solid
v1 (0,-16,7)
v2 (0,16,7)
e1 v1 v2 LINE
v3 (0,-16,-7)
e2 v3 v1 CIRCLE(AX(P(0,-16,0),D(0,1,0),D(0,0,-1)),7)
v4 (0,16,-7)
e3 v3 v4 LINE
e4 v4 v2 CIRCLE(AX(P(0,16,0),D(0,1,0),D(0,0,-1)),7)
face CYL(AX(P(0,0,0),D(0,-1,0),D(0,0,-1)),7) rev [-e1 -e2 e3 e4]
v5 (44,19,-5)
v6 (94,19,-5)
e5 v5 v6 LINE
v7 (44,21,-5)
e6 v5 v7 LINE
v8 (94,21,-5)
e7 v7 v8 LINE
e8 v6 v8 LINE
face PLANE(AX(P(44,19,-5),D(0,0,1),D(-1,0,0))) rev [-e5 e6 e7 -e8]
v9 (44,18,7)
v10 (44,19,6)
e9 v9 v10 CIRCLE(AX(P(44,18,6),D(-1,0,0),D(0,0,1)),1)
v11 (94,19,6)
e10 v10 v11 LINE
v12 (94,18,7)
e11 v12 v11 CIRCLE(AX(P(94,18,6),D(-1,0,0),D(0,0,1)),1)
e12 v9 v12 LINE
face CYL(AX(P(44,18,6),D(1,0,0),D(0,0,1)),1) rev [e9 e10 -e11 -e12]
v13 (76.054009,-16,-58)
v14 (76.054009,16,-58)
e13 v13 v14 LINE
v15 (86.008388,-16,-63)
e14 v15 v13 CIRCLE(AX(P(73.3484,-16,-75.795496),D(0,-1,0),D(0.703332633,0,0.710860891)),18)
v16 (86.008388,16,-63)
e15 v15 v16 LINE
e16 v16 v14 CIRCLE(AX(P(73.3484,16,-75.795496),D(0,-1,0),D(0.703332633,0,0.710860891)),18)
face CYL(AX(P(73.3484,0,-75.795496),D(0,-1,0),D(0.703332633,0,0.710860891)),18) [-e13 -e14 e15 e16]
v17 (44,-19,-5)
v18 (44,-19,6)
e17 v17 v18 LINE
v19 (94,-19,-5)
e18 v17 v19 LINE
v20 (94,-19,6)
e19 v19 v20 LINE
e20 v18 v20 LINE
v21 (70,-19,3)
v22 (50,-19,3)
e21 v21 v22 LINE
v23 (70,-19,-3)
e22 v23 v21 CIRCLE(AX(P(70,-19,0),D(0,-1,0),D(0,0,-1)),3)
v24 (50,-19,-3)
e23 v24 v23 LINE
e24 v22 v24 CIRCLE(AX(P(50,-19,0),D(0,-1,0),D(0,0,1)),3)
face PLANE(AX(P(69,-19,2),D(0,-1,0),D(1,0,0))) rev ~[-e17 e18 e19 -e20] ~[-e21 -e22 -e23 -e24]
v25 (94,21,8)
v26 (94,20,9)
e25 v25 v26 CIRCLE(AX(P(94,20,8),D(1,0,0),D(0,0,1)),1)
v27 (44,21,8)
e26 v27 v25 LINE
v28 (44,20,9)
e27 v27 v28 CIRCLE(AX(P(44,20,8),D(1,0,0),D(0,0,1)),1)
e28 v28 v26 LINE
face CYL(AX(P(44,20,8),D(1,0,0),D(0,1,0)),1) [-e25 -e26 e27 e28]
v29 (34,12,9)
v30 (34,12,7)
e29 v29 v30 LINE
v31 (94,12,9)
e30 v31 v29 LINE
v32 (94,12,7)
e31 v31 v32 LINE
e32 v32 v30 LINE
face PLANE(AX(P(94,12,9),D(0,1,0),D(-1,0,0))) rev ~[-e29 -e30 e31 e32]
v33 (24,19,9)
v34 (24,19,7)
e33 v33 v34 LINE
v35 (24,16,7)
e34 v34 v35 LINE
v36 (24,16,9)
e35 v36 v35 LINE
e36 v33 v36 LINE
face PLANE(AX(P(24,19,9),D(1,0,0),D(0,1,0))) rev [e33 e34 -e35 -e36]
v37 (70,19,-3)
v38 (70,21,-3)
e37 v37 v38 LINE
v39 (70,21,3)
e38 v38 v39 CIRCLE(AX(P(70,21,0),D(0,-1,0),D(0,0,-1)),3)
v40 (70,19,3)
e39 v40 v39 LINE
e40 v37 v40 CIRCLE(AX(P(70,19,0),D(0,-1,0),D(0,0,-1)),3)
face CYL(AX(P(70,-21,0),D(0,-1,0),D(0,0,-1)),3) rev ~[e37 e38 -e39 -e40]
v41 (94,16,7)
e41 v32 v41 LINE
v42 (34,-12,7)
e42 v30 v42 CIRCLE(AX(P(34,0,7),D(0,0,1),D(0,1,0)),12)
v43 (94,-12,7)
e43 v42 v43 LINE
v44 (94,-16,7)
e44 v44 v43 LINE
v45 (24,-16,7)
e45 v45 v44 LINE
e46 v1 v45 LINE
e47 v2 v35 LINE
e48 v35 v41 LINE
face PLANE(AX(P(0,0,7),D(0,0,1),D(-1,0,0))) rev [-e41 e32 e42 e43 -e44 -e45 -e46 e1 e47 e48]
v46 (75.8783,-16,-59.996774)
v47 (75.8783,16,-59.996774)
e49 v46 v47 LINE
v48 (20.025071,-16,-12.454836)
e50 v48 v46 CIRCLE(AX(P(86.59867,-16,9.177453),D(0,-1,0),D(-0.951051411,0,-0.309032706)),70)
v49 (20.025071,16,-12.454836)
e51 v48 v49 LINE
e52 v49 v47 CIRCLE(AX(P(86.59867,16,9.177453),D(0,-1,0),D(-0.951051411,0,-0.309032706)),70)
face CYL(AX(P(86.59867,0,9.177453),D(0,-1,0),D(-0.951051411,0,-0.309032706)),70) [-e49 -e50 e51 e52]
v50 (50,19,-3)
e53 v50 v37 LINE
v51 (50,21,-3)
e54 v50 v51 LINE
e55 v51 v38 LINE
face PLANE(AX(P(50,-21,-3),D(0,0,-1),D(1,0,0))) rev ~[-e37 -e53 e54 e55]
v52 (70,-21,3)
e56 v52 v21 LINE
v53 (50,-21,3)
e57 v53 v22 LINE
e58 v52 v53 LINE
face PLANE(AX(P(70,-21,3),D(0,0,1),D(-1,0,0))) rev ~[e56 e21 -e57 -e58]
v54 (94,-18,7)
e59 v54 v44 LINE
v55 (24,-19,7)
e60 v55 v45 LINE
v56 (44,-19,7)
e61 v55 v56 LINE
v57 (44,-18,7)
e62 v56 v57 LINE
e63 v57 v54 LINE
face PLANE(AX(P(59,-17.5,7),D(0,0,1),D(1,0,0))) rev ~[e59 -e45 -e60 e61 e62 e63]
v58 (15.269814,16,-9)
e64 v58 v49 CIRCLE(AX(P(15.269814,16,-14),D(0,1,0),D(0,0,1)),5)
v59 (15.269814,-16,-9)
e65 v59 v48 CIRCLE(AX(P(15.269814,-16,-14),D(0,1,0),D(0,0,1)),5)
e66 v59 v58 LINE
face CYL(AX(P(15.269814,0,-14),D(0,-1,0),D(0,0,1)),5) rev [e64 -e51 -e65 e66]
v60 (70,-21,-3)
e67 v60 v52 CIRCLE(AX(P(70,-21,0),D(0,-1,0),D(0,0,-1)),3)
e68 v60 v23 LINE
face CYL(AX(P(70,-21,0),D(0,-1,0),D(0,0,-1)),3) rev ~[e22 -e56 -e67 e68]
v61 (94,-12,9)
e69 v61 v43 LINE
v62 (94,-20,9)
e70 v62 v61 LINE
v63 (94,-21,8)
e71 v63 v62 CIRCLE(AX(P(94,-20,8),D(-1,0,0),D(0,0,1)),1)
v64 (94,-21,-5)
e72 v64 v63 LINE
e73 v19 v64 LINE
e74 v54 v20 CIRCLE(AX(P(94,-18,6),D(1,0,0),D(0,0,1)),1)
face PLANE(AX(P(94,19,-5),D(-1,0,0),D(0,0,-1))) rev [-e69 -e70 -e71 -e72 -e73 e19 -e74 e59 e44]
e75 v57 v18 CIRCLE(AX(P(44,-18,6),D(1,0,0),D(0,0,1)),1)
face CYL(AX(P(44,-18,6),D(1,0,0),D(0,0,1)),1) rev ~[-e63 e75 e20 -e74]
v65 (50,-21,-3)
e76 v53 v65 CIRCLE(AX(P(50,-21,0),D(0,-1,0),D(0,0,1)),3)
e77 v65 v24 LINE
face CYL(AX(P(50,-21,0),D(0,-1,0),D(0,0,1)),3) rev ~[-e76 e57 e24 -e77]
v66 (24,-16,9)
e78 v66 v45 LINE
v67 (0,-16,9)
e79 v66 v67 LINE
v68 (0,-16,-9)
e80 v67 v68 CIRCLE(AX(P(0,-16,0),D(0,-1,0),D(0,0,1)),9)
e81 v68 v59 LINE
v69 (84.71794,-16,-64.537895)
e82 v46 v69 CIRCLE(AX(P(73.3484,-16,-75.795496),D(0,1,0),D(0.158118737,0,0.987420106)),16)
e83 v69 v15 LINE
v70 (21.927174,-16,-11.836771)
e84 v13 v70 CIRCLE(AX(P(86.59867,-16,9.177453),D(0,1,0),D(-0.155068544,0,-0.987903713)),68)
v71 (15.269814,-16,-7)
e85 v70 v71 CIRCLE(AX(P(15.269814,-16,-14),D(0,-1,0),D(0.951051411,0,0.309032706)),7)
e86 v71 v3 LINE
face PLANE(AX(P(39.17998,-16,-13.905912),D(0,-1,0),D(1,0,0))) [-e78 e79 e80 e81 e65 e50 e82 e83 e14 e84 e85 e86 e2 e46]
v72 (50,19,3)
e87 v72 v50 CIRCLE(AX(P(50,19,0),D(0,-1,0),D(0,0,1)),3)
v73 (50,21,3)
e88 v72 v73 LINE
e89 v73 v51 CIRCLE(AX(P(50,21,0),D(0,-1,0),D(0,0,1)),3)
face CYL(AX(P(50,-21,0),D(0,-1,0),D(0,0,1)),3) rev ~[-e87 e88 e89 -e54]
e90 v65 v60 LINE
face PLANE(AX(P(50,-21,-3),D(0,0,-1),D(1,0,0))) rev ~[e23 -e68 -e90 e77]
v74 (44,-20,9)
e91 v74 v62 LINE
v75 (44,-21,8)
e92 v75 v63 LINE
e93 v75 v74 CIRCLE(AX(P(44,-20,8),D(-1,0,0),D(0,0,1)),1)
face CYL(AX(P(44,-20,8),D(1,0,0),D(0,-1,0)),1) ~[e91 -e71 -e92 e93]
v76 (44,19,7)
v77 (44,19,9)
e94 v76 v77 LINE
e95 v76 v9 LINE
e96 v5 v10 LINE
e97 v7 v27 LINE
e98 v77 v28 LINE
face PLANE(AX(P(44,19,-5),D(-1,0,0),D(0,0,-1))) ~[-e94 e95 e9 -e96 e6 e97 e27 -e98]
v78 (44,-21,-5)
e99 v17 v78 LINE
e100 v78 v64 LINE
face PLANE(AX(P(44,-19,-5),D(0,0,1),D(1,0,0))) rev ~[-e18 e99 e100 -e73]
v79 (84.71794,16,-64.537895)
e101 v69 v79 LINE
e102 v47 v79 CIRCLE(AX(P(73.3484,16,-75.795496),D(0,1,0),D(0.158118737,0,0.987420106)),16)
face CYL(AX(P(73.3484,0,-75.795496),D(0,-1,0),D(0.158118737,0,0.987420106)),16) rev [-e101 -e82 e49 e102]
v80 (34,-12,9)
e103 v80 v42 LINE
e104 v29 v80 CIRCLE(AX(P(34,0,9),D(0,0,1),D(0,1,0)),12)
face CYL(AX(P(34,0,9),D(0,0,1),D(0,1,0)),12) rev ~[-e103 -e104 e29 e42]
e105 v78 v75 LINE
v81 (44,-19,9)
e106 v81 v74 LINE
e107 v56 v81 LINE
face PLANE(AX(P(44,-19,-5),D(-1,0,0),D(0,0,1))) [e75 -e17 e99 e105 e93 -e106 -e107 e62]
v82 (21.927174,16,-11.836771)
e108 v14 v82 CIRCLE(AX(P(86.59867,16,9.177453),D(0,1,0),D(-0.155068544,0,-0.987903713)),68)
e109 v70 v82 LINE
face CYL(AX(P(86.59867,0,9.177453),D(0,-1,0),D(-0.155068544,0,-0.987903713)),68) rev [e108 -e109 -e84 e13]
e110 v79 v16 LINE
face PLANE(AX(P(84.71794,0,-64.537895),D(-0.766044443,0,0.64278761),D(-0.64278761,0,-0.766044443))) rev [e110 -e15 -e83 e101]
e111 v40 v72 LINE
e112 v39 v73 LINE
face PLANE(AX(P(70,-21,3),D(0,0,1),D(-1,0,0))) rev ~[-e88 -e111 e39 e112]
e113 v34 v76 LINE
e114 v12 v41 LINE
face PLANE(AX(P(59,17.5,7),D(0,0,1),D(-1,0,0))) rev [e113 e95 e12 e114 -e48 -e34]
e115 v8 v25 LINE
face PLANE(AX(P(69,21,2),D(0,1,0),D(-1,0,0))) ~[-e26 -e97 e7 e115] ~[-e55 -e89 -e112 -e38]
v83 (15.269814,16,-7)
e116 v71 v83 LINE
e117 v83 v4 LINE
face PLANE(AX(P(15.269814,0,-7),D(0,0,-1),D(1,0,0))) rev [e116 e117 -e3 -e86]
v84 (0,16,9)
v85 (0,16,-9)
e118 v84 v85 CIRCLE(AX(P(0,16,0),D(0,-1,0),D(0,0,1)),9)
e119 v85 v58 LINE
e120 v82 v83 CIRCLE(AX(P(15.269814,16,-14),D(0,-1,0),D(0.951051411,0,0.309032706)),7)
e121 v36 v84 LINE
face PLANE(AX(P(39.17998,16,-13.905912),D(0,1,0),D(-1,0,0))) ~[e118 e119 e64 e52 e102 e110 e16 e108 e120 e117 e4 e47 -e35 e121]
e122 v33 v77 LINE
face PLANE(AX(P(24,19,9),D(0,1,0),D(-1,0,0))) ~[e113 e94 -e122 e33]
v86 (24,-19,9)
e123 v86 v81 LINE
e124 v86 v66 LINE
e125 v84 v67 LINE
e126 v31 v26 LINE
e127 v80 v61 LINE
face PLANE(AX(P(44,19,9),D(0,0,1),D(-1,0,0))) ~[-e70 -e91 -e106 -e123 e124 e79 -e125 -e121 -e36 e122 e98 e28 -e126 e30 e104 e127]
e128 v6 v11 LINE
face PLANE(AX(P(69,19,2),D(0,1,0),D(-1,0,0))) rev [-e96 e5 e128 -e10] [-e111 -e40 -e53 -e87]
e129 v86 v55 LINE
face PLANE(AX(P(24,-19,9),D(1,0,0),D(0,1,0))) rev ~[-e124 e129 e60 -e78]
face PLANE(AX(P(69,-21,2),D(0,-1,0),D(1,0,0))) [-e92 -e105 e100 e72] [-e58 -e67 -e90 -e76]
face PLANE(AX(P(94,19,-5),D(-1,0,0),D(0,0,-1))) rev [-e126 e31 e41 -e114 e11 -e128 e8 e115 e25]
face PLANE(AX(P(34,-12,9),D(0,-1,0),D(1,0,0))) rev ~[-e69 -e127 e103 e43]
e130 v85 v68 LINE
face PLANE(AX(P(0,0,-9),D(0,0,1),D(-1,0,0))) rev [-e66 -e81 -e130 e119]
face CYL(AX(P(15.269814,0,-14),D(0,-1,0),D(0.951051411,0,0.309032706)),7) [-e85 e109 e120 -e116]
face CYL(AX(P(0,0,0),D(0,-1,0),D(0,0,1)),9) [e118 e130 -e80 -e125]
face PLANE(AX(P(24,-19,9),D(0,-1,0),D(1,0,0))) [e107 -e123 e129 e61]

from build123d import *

# Parameters (mm, degrees)
F1_DEPTH  = 16
F2_W      = 70
F2_H      = 3
F3_DEPTH  = 2
F4_W      = 50
F4_H      = 14
F5_DEPTH  = 2
F6_R      = 1
F9_DEPTH  = 2
F11_DEPTH = 42.001


with BuildPart() as f1:
    # F0 (on Front) → F1 (new body)
    with BuildSketch(Plane.XZ):
        with BuildLine():
            Line((94, 9), (0, 9))
            ThreePointArc((0, 9), (-9, 0), (0, -9))
            Line((0, -9), (15.2698143006, -9))
            ThreePointArc((15.2698143006, -9), (18.2087071496, -9.9548907528), (20.0250713566, -12.4548364712))
            ThreePointArc((20.0250713566, -12.4548364712), (41.226339877, -44.1268775333), (75.8783002618, -59.9967739854))
            ThreePointArc((75.8783002618, -59.9967739854), (80.6596281551, -61.5636317865), (84.7179401809, -64.5378952739))
            Line((84.7179401809, -64.5378952739), (86.0083877193, -62.9999997839))
            ThreePointArc((86.0083877193, -62.9999997839), (81.4277187811, -59.7105770288), (76.0540091245, -57.9999997839))
            ThreePointArc((76.0540091245, -57.9999997839), (42.4723911749, -42.5610388699), (21.9271739736, -11.8367711264))
            ThreePointArc((21.9271739736, -11.8367711264), (19.3842641622, -8.3368472287), (15.2698143006, -7.0000002161))
            Line((15.2698143006, -7.0000002161), (0, -7.0000002161))
            ThreePointArc((0, -7.0000002161), (-7.0000002161, 0), (0, 7.0000002161))
            Line((0, 7.0000002161), (94, 7.0000002161))
            Line((94, 7.0000002161), (94, 9))
        make_face()
    extrude(amount=F1_DEPTH)

    # F2 (on face) → F3 (join)
    with BuildSketch(Plane.XY.offset(9)):
        with Locations((59, -17.5)):
            Rectangle(F2_W, F2_H)
    extrude(amount=-F3_DEPTH)

    # F4 (on face) → F5 (join)
    with BuildSketch(Plane.XZ.offset(19)):
        with Locations((69, 2)):
            Rectangle(F4_W, F4_H)
    extrude(amount=F5_DEPTH)

    # F6
    f6_edges = [f1.edges().sort_by_distance(p)[0] for p in [
        (69, -21, 9),
        (69, -19, 7),
    ]]
    fillet(f6_edges, radius=F6_R)

    # F7: F1 across plane


with BuildPart() as f1_1:
    add(f1.part)
    add(f1.part.mirror(Plane.XZ))

    # F8 (on face) → F9 (cut)
    with BuildSketch(Plane.XY.offset(9)):
        with BuildLine():
            Line((94, 12), (34, 12))
            ThreePointArc((34, 12), (22, 0), (34, -12))
            Line((34, -12), (94, -12))
            Line((94, -12), (94, 12))
        make_face()
    extrude(amount=-F9_DEPTH, mode=Mode.SUBTRACT)

    # F10 (on face) → F11 (cut, through all)
    with BuildSketch(Plane.XZ.offset(21)):
        with BuildLine():
            ThreePointArc((50, 3), (47, 0), (50, -3))
            Line((50, -3), (70, -3))
            ThreePointArc((70, -3), (73, 0), (70, 3))
            Line((70, 3), (50, 3))
        make_face()
    extrude(amount=-F11_DEPTH, mode=Mode.SUBTRACT)


solid = f1_1.part
